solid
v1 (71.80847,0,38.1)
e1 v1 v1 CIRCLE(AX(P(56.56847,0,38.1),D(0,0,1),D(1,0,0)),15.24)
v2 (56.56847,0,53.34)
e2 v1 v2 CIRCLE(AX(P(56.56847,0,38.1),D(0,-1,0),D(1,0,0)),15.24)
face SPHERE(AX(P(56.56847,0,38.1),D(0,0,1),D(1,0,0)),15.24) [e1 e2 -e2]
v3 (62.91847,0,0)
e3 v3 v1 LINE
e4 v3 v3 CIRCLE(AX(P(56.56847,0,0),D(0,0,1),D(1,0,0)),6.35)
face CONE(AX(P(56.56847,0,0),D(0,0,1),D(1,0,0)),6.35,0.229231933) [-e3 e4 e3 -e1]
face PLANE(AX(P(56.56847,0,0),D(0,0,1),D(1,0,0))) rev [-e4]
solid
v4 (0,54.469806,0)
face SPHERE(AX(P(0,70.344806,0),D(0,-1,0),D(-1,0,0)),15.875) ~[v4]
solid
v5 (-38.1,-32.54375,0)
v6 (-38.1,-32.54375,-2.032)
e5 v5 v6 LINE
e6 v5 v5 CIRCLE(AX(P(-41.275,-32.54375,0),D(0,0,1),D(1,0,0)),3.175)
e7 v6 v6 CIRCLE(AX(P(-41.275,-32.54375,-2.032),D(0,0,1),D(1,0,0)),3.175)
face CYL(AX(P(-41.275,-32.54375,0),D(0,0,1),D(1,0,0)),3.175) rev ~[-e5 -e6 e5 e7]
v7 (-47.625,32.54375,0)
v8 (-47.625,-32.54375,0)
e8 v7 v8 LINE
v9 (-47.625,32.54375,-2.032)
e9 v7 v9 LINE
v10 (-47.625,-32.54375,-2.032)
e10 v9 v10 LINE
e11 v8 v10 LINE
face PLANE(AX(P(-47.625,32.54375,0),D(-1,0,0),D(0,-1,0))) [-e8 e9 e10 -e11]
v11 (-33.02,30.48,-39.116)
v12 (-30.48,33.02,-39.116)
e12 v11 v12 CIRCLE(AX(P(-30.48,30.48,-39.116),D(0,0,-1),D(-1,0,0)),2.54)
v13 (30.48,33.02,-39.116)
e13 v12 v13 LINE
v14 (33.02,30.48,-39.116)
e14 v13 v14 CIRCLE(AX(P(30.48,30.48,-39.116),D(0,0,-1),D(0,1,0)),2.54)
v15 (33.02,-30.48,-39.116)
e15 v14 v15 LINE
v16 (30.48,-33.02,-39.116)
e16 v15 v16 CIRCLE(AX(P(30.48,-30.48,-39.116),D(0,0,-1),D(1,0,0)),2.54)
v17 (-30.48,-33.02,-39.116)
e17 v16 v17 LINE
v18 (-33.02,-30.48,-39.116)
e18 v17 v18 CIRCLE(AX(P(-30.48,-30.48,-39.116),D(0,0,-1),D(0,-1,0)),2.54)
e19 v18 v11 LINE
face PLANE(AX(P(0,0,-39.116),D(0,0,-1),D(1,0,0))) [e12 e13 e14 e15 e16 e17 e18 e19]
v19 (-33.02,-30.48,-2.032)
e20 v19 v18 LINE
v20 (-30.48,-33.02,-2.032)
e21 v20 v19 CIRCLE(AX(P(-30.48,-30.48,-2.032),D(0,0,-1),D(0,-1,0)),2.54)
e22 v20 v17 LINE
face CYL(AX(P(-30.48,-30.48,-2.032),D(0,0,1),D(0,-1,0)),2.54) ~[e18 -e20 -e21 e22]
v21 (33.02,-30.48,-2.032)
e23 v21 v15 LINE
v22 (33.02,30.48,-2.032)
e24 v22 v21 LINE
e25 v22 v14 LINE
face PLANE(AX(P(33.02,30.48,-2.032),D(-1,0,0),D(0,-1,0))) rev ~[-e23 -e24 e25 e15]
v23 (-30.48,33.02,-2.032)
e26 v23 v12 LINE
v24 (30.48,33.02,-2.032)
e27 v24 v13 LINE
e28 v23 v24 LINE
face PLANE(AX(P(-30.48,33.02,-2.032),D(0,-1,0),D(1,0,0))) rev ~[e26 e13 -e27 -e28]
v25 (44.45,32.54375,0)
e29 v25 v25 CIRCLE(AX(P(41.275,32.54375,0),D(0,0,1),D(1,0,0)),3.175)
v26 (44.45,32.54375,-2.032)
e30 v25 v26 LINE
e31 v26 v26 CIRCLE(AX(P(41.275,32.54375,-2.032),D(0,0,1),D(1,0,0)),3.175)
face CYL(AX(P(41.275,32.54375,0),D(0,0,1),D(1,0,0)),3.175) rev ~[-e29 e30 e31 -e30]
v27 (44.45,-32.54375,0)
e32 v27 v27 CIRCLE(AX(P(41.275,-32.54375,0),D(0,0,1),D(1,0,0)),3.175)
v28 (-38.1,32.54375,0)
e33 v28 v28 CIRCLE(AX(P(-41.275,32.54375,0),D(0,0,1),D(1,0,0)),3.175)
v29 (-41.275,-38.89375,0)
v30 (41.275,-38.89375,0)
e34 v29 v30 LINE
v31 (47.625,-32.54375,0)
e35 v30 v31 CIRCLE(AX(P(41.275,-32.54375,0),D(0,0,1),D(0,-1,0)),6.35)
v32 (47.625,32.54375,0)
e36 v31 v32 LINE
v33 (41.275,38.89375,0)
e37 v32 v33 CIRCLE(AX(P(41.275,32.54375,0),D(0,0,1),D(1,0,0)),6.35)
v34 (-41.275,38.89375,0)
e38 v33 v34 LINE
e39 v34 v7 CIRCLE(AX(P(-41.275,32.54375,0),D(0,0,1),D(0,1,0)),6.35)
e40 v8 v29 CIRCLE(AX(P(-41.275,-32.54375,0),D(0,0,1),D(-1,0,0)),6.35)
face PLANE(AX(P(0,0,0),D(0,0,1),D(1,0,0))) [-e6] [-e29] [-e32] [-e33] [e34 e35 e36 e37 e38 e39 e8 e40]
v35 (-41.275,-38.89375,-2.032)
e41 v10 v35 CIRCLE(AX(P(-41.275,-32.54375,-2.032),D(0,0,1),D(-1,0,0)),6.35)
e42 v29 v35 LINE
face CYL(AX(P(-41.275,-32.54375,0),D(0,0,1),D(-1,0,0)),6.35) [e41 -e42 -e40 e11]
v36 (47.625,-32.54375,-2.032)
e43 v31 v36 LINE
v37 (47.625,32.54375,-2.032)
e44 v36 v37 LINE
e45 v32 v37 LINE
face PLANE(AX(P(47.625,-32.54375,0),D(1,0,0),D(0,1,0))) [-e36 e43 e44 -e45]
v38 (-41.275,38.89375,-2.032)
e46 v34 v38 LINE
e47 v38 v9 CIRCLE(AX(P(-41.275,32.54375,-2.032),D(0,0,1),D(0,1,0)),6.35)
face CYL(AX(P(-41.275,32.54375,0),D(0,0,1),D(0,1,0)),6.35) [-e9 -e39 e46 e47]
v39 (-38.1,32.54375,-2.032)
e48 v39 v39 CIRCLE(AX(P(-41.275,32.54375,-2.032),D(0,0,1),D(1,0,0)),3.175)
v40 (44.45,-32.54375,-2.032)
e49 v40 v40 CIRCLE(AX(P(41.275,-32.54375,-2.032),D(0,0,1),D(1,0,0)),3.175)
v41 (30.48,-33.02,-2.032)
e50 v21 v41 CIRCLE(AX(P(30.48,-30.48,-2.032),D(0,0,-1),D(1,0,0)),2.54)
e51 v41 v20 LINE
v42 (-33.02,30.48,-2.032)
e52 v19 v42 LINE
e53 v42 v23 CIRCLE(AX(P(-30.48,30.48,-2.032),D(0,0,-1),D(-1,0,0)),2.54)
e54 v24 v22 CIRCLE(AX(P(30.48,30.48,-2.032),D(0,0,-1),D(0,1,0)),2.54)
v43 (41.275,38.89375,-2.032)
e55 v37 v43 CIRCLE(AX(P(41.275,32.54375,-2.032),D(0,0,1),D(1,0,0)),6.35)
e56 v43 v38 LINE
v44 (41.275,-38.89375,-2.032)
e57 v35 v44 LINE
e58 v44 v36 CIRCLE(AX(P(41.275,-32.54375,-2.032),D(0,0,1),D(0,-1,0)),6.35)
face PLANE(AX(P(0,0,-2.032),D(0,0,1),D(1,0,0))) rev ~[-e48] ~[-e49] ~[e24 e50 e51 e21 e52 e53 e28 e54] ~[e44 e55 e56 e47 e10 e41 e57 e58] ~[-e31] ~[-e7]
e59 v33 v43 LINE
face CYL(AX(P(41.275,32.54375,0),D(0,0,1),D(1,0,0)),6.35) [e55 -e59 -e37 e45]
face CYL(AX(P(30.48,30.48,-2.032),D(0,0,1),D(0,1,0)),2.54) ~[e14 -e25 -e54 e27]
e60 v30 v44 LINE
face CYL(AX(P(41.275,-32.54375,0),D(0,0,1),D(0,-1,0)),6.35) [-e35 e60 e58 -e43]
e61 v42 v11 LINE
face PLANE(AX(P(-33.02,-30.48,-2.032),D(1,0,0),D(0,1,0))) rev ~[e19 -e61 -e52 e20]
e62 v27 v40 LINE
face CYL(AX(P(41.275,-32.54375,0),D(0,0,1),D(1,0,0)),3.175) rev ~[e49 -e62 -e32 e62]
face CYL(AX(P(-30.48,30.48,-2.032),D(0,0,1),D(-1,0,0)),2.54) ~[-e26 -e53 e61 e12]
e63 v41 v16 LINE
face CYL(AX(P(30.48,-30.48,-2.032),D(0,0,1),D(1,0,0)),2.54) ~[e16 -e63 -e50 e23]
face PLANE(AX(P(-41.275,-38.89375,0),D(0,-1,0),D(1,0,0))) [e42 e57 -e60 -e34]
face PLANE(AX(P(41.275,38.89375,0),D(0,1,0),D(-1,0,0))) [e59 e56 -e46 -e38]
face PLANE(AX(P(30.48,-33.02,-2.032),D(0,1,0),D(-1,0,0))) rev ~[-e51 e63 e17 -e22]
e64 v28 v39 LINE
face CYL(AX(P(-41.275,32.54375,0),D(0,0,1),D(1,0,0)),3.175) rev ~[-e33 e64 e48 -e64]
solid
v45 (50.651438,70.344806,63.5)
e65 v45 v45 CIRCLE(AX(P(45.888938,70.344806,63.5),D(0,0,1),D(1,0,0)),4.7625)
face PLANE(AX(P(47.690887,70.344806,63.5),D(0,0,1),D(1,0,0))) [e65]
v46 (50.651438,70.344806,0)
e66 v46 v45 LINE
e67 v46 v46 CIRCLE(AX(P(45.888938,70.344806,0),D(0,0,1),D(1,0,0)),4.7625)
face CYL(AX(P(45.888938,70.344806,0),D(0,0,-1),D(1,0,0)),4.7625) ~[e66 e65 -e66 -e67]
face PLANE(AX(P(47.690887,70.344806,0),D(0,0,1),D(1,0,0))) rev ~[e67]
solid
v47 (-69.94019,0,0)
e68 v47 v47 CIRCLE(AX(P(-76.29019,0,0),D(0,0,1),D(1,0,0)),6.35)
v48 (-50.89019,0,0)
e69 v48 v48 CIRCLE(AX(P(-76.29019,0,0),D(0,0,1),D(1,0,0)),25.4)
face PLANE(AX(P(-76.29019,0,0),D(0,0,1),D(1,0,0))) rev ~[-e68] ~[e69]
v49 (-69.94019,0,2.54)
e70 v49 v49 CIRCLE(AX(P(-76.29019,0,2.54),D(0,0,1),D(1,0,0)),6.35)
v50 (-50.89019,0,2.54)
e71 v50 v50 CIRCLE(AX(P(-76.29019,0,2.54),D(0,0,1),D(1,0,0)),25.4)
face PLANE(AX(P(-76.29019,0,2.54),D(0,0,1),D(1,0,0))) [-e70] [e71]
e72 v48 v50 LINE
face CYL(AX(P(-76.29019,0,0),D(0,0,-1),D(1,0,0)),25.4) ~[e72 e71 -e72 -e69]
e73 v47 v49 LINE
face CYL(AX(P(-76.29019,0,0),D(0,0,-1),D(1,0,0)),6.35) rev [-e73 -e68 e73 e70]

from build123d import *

# Parameters (mm, degrees)
F0_R     = 3.175
F0_R_2   = 4.7625
F1_DEPTH = 2.032
F3_DEPTH = 37.084
F8_DEPTH = 63.5
F0_R_3   = 25.4
F0_R_4   = 6.35
F9_DEPTH = 2.54


# Not quite as in the source:
# - a feature names something its author has since deleted; it is built from what else it names


with BuildPart() as f1:
    # F0 (on Top) → F1 (new body)
    with BuildSketch(Plane.XY):
        with BuildLine():
            ThreePointArc((47.625, 32.54375), (45.7651280605, 37.0338780605), (41.275, 38.89375))
            Line((41.275, 38.89375), (-41.275, 38.89375))
            ThreePointArc((-41.275, 38.89375), (-45.7651280605, 37.0338780605), (-47.625, 32.54375))
            Line((-47.625, 32.54375), (-47.625, -32.54375))
            ThreePointArc((-47.625, -32.54375), (-45.7651280605, -37.0338780605), (-41.275, -38.89375))
            Line((-41.275, -38.89375), (41.275, -38.89375))
            ThreePointArc((41.275, -38.89375), (45.7651280605, -37.0338780605), (47.625, -32.54375))
            Line((47.625, -32.54375), (47.625, 32.54375))
        make_face()
        with Locations((-41.275, -32.54375)):
            Circle(F0_R, mode=Mode.SUBTRACT)
        with Locations((41.275, -32.54375)):
            Circle(F0_R, mode=Mode.SUBTRACT)
        with Locations((-41.275, 32.54375)):
            Circle(F0_R, mode=Mode.SUBTRACT)
        Circle(F0_R_2, mode=Mode.SUBTRACT)
        with Locations((41.275, 32.54375)):
            Circle(F0_R, mode=Mode.SUBTRACT)
        Circle(F0_R_2)
    extrude(amount=-F1_DEPTH)

    # F2 (on face) → F3 (join)
    with BuildSketch(Plane(origin=(0, 0, -2.032), x_dir=(1, 0, 0), z_dir=(0, 0, -1))):
        with BuildLine():
            ThreePointArc((33.02, 30.48), (32.2760512242, 32.2760512242), (30.48, 33.02))
            Line((30.48, 33.02), (-30.48, 33.02))
            ThreePointArc((-30.48, 33.02), (-32.2760512242, 32.2760512242), (-33.02, 30.48))
            Line((-33.02, 30.48), (-33.02, -30.48))
            ThreePointArc((-33.02, -30.48), (-32.2760512242, -32.2760512242), (-30.48, -33.02))
            Line((-30.48, -33.02), (30.48, -33.02))
            ThreePointArc((30.48, -33.02), (32.2760512242, -32.2760512242), (33.02, -30.48))
            Line((33.02, -30.48), (33.02, 30.48))
        make_face()
    extrude(amount=F3_DEPTH)


with BuildPart() as f5:
    # F4 (on Top) → F5 (revolve)
    with BuildSketch(Plane.XY):
        with BuildLine():
            Line((0, 54.4698057175), (0, 86.2198057175))
            ThreePointArc((0, 86.2198057175), (-15.875, 70.3448057175), (0, 54.4698057175))
        make_face()
    revolve(axis=Axis((0, 70.3448057175, 0), (0, 1, 0)))


with BuildPart() as f7:
    # F6 (on Front) → F7 (revolve)
    with BuildSketch(Plane.XZ):
        Polygon((56.5684698522, 38.1), (56.5684698522, 0), (62.9184698522, 0), (71.8084698522, 38.1), align=None)
        with BuildLine():
            Line((56.5684698522, 53.34), (56.5684698522, 38.1))
            Line((56.5684698522, 38.1), (71.8084698522, 38.1))
            ThreePointArc((71.8084698522, 38.1), (67.3447771975, 48.8763073453), (56.5684698522, 53.34))
        make_face()
    revolve(axis=Axis((56.5684698522, 0, 19.05), (0, 0, 1)))


with BuildPart() as f8:
    # F4 (on Top) → F8 (new body)
    with BuildSketch(Plane.XY):
        with BuildLine():
            ThreePointArc((45.8889380097, 65.5823057175), (49.2565340551, 66.9772096721), (50.6514380097, 70.3448057175))
            ThreePointArc((50.6514380097, 70.3448057175), (49.2565340551, 73.7124017629), (45.8889380097, 75.1073057175))
            Line((45.8889380097, 75.1073057175), (45.8889380097, 65.5823057175))
        make_face()
        with BuildLine():
            Line((45.8889380097, 65.5823057175), (45.8889380097, 75.1073057175))
            ThreePointArc((45.8889380097, 75.1073057175), (41.1264380097, 70.3448057175), (45.8889380097, 65.5823057175))
        make_face()
    extrude(amount=F8_DEPTH)


with BuildPart() as f9:
    # F0 (on Top) → F9 (new body)
    with BuildSketch(Plane.XY):
        with Locations((-76.2901902199, 0)):
            Circle(F0_R_3)
        with Locations((-76.2901902199, 0)):
            Circle(F0_R_4, mode=Mode.SUBTRACT)
    extrude(amount=F9_DEPTH)


solid = Compound([f1.part, f5.part, f7.part, f8.part, f9.part])
